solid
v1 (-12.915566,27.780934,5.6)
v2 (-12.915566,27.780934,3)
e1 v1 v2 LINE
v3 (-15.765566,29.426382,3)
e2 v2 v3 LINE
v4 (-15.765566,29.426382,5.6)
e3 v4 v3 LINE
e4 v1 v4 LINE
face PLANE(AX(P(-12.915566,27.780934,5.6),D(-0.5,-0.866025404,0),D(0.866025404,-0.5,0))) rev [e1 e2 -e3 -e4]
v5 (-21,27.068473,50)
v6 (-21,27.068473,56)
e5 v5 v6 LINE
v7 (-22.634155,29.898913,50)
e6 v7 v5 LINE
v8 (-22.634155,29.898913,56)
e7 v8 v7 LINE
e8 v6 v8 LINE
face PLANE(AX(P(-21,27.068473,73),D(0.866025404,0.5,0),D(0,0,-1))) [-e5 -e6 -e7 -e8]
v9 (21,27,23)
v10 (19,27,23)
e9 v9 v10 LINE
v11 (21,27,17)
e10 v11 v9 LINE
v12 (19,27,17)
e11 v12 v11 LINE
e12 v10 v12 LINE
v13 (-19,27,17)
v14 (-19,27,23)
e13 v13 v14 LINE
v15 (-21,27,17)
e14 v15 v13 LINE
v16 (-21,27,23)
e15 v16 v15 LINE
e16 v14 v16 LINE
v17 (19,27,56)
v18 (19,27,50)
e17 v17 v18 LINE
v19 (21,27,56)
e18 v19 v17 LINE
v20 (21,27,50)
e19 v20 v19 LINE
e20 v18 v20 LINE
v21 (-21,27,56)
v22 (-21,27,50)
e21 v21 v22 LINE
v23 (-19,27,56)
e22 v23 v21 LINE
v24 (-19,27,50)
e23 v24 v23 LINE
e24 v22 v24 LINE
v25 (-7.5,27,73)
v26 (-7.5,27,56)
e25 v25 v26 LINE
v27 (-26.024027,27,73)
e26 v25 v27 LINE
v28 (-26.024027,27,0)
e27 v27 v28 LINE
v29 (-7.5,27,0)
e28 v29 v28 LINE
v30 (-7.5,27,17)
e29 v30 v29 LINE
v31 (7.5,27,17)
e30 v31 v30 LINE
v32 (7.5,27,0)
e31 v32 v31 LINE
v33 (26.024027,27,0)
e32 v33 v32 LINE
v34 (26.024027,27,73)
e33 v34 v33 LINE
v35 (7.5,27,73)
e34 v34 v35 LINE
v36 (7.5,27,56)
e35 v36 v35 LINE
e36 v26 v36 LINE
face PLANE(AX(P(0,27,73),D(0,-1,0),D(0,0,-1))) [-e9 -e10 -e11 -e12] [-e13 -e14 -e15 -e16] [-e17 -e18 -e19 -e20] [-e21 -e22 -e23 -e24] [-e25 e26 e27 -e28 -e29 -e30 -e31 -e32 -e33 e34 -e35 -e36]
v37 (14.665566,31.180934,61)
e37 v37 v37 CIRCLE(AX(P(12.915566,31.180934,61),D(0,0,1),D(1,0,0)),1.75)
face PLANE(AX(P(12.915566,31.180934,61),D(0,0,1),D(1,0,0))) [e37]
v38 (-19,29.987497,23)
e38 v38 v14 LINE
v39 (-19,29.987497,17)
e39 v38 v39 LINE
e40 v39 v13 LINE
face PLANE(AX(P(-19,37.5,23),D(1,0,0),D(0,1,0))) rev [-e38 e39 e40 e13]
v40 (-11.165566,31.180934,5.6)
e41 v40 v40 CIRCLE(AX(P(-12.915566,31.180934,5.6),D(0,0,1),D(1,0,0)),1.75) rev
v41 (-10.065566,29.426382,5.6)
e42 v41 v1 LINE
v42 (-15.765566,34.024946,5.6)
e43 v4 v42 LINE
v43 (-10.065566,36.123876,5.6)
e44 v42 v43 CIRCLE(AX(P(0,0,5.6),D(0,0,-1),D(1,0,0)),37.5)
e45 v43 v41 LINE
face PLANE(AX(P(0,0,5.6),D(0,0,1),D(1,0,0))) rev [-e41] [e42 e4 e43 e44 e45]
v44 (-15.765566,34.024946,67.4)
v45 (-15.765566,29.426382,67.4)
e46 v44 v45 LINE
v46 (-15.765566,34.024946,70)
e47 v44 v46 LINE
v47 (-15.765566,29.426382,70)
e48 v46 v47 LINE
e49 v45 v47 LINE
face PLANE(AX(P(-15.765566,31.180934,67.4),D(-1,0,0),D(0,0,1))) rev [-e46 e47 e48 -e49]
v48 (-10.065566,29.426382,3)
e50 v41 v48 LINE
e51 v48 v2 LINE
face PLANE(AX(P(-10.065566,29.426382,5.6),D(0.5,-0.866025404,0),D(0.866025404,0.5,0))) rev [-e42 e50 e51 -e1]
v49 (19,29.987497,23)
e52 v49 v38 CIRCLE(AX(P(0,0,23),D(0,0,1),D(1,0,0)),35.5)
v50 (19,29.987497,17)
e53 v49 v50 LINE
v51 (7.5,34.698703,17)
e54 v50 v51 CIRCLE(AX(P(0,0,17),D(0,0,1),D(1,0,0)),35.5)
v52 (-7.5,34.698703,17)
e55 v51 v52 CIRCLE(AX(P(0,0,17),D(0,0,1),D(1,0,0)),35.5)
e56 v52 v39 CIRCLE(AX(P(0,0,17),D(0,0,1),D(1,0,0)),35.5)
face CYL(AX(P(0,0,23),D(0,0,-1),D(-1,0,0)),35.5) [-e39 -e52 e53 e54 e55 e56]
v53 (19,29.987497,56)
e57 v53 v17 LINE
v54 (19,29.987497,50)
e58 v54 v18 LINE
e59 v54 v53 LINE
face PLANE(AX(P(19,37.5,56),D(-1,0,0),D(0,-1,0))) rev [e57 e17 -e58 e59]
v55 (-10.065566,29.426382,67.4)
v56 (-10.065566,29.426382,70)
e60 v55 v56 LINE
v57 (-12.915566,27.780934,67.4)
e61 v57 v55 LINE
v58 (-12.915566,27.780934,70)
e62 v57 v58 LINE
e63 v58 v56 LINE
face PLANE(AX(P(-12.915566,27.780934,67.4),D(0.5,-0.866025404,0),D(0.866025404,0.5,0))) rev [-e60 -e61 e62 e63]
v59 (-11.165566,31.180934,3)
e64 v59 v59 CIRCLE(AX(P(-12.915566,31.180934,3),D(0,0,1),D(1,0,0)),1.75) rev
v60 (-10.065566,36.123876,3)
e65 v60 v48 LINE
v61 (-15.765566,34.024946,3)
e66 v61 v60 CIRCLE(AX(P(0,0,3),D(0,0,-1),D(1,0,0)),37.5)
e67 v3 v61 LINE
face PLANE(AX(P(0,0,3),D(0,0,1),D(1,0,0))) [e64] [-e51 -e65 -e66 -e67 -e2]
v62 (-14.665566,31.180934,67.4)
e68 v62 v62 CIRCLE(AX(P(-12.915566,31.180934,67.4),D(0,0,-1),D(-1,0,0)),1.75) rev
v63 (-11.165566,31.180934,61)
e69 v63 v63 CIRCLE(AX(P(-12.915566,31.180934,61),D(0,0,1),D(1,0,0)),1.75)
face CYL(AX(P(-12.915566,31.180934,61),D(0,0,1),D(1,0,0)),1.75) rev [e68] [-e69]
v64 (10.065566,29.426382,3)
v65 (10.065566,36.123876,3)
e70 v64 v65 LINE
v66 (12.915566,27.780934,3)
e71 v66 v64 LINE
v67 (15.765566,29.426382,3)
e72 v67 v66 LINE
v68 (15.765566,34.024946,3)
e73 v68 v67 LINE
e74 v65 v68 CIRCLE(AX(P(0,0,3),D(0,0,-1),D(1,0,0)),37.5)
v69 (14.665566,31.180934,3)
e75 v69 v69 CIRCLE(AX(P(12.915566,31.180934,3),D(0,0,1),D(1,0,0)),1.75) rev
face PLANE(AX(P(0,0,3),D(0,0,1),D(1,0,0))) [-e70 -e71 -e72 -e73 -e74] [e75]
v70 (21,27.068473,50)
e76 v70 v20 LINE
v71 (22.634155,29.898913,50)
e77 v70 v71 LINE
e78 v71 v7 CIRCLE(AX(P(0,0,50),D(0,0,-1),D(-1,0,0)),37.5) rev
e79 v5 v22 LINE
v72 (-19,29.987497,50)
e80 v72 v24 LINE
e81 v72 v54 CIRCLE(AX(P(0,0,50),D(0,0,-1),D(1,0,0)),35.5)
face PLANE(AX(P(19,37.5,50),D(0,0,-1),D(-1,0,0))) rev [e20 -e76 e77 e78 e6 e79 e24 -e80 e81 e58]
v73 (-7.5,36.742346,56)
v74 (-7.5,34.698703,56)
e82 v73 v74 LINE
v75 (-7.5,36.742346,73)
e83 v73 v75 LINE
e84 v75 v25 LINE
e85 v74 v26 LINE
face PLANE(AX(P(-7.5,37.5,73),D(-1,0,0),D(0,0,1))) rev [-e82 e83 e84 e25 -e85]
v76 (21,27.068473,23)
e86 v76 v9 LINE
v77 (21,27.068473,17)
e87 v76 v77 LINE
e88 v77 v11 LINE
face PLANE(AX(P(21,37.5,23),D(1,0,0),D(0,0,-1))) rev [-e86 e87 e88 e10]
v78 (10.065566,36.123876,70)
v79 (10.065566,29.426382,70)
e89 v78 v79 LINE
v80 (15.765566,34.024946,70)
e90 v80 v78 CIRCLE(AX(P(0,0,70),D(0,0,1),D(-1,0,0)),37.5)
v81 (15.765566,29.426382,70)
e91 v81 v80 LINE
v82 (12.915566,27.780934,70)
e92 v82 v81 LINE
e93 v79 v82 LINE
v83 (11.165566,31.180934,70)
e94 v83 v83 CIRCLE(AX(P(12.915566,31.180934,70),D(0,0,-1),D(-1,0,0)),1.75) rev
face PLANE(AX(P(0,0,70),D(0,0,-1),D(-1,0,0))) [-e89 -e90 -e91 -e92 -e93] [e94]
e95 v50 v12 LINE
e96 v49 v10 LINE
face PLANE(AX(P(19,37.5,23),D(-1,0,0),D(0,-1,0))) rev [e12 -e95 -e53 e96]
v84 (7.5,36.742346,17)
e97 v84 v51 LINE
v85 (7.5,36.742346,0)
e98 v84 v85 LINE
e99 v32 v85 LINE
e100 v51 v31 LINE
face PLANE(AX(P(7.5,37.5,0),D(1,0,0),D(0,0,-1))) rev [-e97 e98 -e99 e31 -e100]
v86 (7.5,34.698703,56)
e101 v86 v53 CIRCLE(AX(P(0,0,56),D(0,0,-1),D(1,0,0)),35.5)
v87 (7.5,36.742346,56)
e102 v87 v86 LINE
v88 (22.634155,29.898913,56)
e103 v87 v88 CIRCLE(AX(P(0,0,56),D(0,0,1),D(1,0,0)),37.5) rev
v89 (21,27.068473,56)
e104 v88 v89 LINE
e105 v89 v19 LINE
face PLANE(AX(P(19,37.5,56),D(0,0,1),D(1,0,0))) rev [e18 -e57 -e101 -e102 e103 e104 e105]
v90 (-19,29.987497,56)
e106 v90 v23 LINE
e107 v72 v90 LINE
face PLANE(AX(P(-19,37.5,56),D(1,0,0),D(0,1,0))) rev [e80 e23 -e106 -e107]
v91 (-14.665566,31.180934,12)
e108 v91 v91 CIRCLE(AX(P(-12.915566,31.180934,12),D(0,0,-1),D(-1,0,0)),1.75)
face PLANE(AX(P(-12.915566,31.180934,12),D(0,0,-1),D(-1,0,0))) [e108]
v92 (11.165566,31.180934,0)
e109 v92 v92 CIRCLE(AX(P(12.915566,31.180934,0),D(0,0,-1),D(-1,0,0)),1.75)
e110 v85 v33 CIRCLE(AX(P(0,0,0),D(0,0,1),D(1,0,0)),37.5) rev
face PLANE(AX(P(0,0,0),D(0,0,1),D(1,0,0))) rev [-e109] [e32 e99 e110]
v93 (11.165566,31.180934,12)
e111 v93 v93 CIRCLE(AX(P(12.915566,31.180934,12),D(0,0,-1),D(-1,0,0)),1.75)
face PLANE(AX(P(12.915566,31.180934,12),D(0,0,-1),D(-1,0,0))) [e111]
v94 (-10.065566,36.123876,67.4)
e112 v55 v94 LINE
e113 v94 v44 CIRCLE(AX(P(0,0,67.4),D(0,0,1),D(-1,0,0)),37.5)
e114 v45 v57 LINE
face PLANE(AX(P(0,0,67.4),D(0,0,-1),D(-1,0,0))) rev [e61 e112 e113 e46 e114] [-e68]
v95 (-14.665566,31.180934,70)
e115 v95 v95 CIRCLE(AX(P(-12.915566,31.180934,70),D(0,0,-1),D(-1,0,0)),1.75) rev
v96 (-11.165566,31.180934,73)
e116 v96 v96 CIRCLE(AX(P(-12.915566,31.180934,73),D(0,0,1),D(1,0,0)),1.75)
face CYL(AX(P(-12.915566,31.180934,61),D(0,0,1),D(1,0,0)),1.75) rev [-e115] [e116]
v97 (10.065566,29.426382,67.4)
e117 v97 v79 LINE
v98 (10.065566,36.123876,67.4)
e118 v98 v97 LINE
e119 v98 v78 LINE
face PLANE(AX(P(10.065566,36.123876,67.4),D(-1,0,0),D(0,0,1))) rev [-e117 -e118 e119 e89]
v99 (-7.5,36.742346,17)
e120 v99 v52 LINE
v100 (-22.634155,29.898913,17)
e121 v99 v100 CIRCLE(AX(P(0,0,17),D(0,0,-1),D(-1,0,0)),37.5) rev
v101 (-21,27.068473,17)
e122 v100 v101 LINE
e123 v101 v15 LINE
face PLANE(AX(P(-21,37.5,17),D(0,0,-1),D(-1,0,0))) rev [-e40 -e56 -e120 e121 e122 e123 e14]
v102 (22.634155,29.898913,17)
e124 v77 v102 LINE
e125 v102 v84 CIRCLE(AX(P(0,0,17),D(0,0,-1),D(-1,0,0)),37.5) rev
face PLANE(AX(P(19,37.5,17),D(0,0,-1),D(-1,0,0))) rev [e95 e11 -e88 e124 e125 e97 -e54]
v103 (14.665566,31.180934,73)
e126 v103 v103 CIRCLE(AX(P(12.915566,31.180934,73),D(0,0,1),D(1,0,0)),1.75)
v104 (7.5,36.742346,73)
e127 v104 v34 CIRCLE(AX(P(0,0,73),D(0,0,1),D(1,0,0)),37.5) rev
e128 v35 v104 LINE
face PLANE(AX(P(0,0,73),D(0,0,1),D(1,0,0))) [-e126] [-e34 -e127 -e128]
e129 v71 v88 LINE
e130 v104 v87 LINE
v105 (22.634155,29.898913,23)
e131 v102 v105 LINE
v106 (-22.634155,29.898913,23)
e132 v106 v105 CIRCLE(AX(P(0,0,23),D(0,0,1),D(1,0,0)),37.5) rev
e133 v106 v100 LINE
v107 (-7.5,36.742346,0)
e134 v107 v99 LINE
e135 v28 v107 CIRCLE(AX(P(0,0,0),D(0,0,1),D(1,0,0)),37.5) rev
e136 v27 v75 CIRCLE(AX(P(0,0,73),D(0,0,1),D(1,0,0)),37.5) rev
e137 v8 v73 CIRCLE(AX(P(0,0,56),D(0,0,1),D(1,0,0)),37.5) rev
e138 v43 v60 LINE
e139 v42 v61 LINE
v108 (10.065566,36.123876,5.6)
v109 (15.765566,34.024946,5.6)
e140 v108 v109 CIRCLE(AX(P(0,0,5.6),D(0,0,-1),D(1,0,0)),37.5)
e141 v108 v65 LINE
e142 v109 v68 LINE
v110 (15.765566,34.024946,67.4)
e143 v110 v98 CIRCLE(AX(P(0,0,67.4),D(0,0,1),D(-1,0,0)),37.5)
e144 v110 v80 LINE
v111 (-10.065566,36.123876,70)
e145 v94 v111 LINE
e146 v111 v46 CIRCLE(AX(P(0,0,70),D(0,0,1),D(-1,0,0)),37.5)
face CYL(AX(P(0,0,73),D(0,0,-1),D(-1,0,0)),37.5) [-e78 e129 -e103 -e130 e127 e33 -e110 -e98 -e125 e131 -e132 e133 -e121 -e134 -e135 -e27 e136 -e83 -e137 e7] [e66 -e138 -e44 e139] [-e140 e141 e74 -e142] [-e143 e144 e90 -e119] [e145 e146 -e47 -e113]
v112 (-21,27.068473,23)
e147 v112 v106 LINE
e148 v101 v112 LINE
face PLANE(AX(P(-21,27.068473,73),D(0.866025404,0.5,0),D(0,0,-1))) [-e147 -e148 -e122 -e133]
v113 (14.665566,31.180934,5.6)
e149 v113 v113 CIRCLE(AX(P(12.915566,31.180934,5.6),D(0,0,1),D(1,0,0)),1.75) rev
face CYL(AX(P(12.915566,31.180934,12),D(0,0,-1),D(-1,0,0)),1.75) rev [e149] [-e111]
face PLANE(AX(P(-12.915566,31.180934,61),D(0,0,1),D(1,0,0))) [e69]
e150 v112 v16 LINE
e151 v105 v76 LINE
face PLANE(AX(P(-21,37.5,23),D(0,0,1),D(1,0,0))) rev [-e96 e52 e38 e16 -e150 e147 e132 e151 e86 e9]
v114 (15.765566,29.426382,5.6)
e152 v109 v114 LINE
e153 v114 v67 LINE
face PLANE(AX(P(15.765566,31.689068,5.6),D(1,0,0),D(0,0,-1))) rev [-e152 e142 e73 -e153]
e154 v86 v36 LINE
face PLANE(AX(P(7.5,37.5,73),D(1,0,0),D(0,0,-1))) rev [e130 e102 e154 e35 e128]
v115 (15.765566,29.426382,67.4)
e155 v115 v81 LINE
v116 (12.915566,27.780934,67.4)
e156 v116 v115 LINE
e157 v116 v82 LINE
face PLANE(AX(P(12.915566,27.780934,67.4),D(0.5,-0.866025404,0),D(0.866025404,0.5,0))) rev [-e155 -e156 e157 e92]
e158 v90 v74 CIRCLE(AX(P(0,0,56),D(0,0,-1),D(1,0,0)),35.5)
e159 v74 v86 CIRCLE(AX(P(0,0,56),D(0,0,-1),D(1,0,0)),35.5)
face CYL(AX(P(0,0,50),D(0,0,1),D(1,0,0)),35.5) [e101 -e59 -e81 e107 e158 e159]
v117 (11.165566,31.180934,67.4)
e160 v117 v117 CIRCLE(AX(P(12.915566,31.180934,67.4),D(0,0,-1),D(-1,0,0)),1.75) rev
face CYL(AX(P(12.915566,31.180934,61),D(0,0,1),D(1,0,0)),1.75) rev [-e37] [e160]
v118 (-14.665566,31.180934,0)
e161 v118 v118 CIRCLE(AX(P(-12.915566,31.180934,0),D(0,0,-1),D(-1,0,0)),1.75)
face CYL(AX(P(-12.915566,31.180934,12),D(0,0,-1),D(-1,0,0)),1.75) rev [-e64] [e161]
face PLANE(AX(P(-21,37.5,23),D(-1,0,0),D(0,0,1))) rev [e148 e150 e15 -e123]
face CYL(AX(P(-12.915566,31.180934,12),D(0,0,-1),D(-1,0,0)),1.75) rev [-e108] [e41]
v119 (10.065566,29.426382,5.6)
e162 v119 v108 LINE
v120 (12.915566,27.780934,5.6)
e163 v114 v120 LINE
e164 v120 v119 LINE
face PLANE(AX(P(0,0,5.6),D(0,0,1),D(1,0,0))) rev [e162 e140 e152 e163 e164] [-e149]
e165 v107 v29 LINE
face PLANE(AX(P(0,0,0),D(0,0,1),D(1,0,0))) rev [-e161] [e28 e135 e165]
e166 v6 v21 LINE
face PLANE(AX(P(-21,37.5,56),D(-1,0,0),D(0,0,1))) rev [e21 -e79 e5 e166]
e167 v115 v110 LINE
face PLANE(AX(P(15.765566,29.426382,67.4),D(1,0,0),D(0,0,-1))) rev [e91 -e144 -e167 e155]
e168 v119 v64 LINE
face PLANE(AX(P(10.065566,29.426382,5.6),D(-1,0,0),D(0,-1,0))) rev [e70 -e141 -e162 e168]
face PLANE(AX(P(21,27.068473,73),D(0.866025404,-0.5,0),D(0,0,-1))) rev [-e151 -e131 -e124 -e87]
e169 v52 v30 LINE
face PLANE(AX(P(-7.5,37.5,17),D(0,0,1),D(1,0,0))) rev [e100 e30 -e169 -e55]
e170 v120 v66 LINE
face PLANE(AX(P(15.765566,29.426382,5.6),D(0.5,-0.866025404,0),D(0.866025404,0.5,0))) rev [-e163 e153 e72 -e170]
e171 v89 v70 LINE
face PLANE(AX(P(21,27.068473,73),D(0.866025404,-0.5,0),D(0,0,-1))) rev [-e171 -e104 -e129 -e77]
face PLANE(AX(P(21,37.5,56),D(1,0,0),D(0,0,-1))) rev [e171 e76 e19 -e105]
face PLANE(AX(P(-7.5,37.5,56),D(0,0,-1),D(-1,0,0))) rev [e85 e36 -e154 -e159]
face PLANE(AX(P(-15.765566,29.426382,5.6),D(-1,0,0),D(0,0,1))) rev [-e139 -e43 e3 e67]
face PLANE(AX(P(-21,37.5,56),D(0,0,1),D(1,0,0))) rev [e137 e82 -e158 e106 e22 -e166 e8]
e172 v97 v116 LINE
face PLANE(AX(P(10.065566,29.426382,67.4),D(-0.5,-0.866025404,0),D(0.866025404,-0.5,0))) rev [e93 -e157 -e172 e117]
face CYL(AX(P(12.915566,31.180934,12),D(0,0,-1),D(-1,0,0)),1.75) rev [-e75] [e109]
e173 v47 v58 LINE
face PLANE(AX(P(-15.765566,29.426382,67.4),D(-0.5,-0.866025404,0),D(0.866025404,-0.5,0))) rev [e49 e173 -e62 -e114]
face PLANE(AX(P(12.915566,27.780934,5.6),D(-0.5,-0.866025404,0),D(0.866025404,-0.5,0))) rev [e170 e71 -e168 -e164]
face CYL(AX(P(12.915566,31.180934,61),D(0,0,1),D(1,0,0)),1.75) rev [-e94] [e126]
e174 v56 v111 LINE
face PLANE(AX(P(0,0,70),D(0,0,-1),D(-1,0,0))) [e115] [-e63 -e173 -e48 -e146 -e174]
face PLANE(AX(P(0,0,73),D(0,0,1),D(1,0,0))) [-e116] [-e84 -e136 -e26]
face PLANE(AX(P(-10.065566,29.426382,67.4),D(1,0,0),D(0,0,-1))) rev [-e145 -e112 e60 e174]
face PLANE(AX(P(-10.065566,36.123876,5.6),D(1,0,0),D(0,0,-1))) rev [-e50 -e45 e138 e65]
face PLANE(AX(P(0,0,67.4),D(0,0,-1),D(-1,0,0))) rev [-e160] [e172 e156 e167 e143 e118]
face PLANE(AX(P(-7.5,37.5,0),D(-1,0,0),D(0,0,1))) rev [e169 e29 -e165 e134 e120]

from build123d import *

# Parameters (mm, degrees)
BOSS_EXTRU_2_DEPTH       = 73
ESQUISSE7_R              = 1.75
ENL_V_MAT_EXTRU_4_DEPTH  = 12
ENL_V_START              = -5.6
ENL_V_MAT_EXTRU_5_DEPTH  = 2.6
ENL_V_START_2            = -12
ESQUISSE12_R             = 1.75
ENL_V_MAT_EXTRU_6_DEPTH  = 12
ENL_V_START_3            = -3
ENL_V_MAT_EXTRU_7_DEPTH  = 2.6
ESQUISSE21_W             = 15
ESQUISSE21_H             = 17
ENL_V_MAT_EXTRU_14_DEPTH = 79.208055851
ESQUISSE22_W             = 2
ESQUISSE22_H             = 6
ENL_V_MAT_EXTRU_15_DEPTH = 79.208055851
ENL_V_START_4            = -17
ENL_V_MAT_EXTRU_17_DEPTH = 6
ENL_V_START_5            = -23
ENL_V_MAT_EXTRU_19_DEPTH = 6
CHANFREIN1_SIZE          = 4
CHANFREIN2_SIZE          = 4


with BuildPart() as part:
    # Esquisse3 → Boss.-Extru.2 (new body)
    with BuildSketch(Plane.XY):
        with BuildLine():
            ThreePointArc((-26.024027359, 27), (0, 37.5), (26.024027359, 27))
            Line((26.024027359, 27), (13.076696831, 27))
            Line((13.076696831, 27), (-13.076696831, 27))
            Line((-13.076696831, 27), (-26.024027359, 27))
        make_face()
    extrude(amount=BOSS_EXTRU_2_DEPTH)

    # Esquisse7 → Enlèv. mat.-Extru.4 (cut)
    with BuildSketch(Plane.XY.offset(73)):
        with Locations((-12.915565842, 31.180934222)):
            Circle(ESQUISSE7_R)
        with Locations((12.915565842, 31.180934222)):
            Circle(ESQUISSE7_R)
    extrude(amount=-ENL_V_MAT_EXTRU_4_DEPTH, mode=Mode.SUBTRACT)

    # Esquisse11 → Enlèv. mat.-Extru.5 (cut)
    with BuildSketch(Plane.XY.offset(73).offset(ENL_V_START)):
        with BuildLine():
            Line((-15.765565842, 31.180934222), (-15.765565842, 34.024945756))
            ThreePointArc((-15.765565842, 34.024945756), (-12.95813326, 35.190009696), (-10.065565842, 36.123875543))
            Line((-10.065565842, 36.123875543), (-10.065565842, 29.426382489))
            Line((-10.065565842, 29.426382489), (-12.915565842, 27.780934222))
            Line((-12.915565842, 27.780934222), (-15.765565842, 29.426382489))
            Line((-15.765565842, 29.426382489), (-15.765565842, 31.180934222))
        make_face()
        with BuildLine():
            Line((10.065565842, 36.123875543), (10.065565842, 29.426382489))
            Line((10.065565842, 29.426382489), (12.915565842, 27.780934222))
            Line((12.915565842, 27.780934222), (15.765565842, 29.426382489))
            Line((15.765565842, 29.426382489), (15.765565842, 34.024945756))
            ThreePointArc((15.765565842, 34.024945756), (12.95813326, 35.190009696), (10.065565842, 36.123875543))
        make_face()
    extrude(amount=ENL_V_MAT_EXTRU_5_DEPTH, mode=Mode.SUBTRACT)

    # Esquisse12 → Enlèv. mat.-Extru.6 (cut)
    with BuildSketch(Plane(origin=(0, 0, 0), x_dir=(-1, 0, 0), z_dir=(0, 0, -1)).offset(ENL_V_START_2)):
        with Locations(Location((-12.915565842, 31.180934222, 0), (0, 0, 180))):
            Circle(ESQUISSE12_R)
        with Locations(Location((12.915565842, 31.180934222, 0), (0, 0, 180))):
            Circle(ESQUISSE12_R)
    extrude(amount=ENL_V_MAT_EXTRU_6_DEPTH, mode=Mode.SUBTRACT)

    # Esquisse14 → Enlèv. mat.-Extru.7 (cut)
    with BuildSketch(Plane(origin=(0, 0, 0), x_dir=(-1, 0, 0), z_dir=(0, 0, -1)).offset(ENL_V_START_3)):
        with BuildLine():
            Line((-15.765565842, 31.689067965), (-15.765565842, 34.024945756))
            ThreePointArc((-15.765565842, 34.024945756), (-12.95813326, 35.190009696), (-10.065565842, 36.123875543))
            Line((-10.065565842, 36.123875543), (-10.065565842, 29.426382489))
            Line((-10.065565842, 29.426382489), (-12.915565842, 27.780934222))
            Line((-12.915565842, 27.780934222), (-15.765565842, 29.426382489))
            Line((-15.765565842, 29.426382489), (-15.765565842, 31.689067965))
        make_face()
        with BuildLine():
            Line((10.065565842, 36.123875543), (10.065565842, 29.426382489))
            Line((10.065565842, 29.426382489), (12.915565842, 27.780934222))
            Line((12.915565842, 27.780934222), (15.765565842, 29.426382489))
            Line((15.765565842, 29.426382489), (15.765565842, 34.024945756))
            ThreePointArc((15.765565842, 34.024945756), (12.95813326, 35.190009696), (10.065565842, 36.123875543))
        make_face()
    extrude(amount=-ENL_V_MAT_EXTRU_7_DEPTH, mode=Mode.SUBTRACT)

    # Esquisse21 → Enlèv. mat.-Extru.14 (cut, through all)
    with BuildSketch(Plane.XZ.offset(-27)):
        with Locations((0, 64.5)):
            Rectangle(ESQUISSE21_W, ESQUISSE21_H)
        with Locations((0, 8.5)):
            Rectangle(ESQUISSE21_W, ESQUISSE21_H)
    extrude(amount=-ENL_V_MAT_EXTRU_14_DEPTH, mode=Mode.SUBTRACT)

    # Esquisse22 → Enlèv. mat.-Extru.15 (cut, through all)
    with BuildSketch(Plane.XZ.offset(-27)):
        with Locations((-20, 53)):
            Rectangle(ESQUISSE22_W, ESQUISSE22_H)
        with Locations((20, 53)):
            Rectangle(ESQUISSE22_W, ESQUISSE22_H)
        with Locations((-20, 20)):
            Rectangle(ESQUISSE22_W, ESQUISSE22_H)
        with Locations((20, 20)):
            Rectangle(ESQUISSE22_W, ESQUISSE22_H)
    extrude(amount=-ENL_V_MAT_EXTRU_15_DEPTH, mode=Mode.SUBTRACT)

    # Esquisse23 → Enlèv. mat.-Extru.17 (cut)
    with BuildSketch(Plane(origin=(0, 0, 0), x_dir=(-1, 0, 0), z_dir=(0, 0, -1)).offset(ENL_V_START_4)):
        with BuildLine():
            Line((-19, 29.987497395), (-19, 32.330326321))
            ThreePointArc((-19, 32.330326321), (0, 37.5), (19, 32.330326321))
            Line((19, 32.330326321), (19, 29.987497395))
            ThreePointArc((19, 29.987497395), (0, 35.5), (-19, 29.987497395))
        make_face()
    extrude(amount=-ENL_V_MAT_EXTRU_17_DEPTH, mode=Mode.SUBTRACT)

    # Esquisse27 → Enlèv. mat.-Extru.19 (cut)
    with BuildSketch(Plane.XY.offset(73).offset(ENL_V_START_5)):
        with BuildLine():
            Line((-19, 32.330326321), (-19, 29.987497395))
            ThreePointArc((-19, 29.987497395), (0, 35.5), (19, 29.987497395))
            Line((19, 29.987497395), (19, 32.330326321))
            ThreePointArc((19, 32.330326321), (0, 37.5), (-19, 32.330326321))
        make_face()
    extrude(amount=ENL_V_MAT_EXTRU_19_DEPTH, mode=Mode.SUBTRACT)

    # Chanfrein1
    # the kernel refuses this chamfer: 4, 2.005021286 mm, written as the material it takes off along each edge
    with BuildSketch(Plane(origin=(21, 31.068472766, 56), x_dir=(0.8131904360311143, -0.581997693077495, 0), z_dir=(0, 0, -1)), Plane(origin=(21, 31.068472766, 23), x_dir=(0.8131904360311155, -0.5819976930774934, 0), z_dir=(0, 0, -1))) as chanfrein1_piece_1:
        with BuildLine():
            Line((2.009560641, 0), (CHANFREIN1_SIZE * 0.581997693077, CHANFREIN1_SIZE * 0.813190436031))
            Line((CHANFREIN1_SIZE * 0.581997693077, CHANFREIN1_SIZE * 0.813190436031), (0, 0))
            ThreePointArc((0, 0), (0.996999681, -0.013462723), (2.009560641, 0))
        make_face()
    extrude(amount=6, mode=Mode.SUBTRACT)

    # Chanfrein2
    # the kernel refuses this chamfer: 4, 2.005021286 mm, written as the material it takes off along each edge
    with BuildSketch(Plane(origin=(-21, 31.068472766, 23), x_dir=(-0.8131904360311136, -0.5819976930774963, 0), z_dir=(0, 0, -1)), Plane(origin=(-21, 31.068472766, 56), x_dir=(-0.8131904360311129, -0.581997693077497, 0), z_dir=(0, 0, -1))) as chanfrein2_piece_1:
        with BuildLine():
            Line((2.009560641, 0), (CHANFREIN2_SIZE * 0.581997693077, -CHANFREIN2_SIZE * 0.813190436031))
            Line((CHANFREIN2_SIZE * 0.581997693077, -CHANFREIN2_SIZE * 0.813190436031), (0, 0))
            ThreePointArc((0, 0), (0.996999681, 0.013462723), (2.009560641, 0))
        make_face()
    extrude(amount=6, mode=Mode.SUBTRACT)


solid = part.part
